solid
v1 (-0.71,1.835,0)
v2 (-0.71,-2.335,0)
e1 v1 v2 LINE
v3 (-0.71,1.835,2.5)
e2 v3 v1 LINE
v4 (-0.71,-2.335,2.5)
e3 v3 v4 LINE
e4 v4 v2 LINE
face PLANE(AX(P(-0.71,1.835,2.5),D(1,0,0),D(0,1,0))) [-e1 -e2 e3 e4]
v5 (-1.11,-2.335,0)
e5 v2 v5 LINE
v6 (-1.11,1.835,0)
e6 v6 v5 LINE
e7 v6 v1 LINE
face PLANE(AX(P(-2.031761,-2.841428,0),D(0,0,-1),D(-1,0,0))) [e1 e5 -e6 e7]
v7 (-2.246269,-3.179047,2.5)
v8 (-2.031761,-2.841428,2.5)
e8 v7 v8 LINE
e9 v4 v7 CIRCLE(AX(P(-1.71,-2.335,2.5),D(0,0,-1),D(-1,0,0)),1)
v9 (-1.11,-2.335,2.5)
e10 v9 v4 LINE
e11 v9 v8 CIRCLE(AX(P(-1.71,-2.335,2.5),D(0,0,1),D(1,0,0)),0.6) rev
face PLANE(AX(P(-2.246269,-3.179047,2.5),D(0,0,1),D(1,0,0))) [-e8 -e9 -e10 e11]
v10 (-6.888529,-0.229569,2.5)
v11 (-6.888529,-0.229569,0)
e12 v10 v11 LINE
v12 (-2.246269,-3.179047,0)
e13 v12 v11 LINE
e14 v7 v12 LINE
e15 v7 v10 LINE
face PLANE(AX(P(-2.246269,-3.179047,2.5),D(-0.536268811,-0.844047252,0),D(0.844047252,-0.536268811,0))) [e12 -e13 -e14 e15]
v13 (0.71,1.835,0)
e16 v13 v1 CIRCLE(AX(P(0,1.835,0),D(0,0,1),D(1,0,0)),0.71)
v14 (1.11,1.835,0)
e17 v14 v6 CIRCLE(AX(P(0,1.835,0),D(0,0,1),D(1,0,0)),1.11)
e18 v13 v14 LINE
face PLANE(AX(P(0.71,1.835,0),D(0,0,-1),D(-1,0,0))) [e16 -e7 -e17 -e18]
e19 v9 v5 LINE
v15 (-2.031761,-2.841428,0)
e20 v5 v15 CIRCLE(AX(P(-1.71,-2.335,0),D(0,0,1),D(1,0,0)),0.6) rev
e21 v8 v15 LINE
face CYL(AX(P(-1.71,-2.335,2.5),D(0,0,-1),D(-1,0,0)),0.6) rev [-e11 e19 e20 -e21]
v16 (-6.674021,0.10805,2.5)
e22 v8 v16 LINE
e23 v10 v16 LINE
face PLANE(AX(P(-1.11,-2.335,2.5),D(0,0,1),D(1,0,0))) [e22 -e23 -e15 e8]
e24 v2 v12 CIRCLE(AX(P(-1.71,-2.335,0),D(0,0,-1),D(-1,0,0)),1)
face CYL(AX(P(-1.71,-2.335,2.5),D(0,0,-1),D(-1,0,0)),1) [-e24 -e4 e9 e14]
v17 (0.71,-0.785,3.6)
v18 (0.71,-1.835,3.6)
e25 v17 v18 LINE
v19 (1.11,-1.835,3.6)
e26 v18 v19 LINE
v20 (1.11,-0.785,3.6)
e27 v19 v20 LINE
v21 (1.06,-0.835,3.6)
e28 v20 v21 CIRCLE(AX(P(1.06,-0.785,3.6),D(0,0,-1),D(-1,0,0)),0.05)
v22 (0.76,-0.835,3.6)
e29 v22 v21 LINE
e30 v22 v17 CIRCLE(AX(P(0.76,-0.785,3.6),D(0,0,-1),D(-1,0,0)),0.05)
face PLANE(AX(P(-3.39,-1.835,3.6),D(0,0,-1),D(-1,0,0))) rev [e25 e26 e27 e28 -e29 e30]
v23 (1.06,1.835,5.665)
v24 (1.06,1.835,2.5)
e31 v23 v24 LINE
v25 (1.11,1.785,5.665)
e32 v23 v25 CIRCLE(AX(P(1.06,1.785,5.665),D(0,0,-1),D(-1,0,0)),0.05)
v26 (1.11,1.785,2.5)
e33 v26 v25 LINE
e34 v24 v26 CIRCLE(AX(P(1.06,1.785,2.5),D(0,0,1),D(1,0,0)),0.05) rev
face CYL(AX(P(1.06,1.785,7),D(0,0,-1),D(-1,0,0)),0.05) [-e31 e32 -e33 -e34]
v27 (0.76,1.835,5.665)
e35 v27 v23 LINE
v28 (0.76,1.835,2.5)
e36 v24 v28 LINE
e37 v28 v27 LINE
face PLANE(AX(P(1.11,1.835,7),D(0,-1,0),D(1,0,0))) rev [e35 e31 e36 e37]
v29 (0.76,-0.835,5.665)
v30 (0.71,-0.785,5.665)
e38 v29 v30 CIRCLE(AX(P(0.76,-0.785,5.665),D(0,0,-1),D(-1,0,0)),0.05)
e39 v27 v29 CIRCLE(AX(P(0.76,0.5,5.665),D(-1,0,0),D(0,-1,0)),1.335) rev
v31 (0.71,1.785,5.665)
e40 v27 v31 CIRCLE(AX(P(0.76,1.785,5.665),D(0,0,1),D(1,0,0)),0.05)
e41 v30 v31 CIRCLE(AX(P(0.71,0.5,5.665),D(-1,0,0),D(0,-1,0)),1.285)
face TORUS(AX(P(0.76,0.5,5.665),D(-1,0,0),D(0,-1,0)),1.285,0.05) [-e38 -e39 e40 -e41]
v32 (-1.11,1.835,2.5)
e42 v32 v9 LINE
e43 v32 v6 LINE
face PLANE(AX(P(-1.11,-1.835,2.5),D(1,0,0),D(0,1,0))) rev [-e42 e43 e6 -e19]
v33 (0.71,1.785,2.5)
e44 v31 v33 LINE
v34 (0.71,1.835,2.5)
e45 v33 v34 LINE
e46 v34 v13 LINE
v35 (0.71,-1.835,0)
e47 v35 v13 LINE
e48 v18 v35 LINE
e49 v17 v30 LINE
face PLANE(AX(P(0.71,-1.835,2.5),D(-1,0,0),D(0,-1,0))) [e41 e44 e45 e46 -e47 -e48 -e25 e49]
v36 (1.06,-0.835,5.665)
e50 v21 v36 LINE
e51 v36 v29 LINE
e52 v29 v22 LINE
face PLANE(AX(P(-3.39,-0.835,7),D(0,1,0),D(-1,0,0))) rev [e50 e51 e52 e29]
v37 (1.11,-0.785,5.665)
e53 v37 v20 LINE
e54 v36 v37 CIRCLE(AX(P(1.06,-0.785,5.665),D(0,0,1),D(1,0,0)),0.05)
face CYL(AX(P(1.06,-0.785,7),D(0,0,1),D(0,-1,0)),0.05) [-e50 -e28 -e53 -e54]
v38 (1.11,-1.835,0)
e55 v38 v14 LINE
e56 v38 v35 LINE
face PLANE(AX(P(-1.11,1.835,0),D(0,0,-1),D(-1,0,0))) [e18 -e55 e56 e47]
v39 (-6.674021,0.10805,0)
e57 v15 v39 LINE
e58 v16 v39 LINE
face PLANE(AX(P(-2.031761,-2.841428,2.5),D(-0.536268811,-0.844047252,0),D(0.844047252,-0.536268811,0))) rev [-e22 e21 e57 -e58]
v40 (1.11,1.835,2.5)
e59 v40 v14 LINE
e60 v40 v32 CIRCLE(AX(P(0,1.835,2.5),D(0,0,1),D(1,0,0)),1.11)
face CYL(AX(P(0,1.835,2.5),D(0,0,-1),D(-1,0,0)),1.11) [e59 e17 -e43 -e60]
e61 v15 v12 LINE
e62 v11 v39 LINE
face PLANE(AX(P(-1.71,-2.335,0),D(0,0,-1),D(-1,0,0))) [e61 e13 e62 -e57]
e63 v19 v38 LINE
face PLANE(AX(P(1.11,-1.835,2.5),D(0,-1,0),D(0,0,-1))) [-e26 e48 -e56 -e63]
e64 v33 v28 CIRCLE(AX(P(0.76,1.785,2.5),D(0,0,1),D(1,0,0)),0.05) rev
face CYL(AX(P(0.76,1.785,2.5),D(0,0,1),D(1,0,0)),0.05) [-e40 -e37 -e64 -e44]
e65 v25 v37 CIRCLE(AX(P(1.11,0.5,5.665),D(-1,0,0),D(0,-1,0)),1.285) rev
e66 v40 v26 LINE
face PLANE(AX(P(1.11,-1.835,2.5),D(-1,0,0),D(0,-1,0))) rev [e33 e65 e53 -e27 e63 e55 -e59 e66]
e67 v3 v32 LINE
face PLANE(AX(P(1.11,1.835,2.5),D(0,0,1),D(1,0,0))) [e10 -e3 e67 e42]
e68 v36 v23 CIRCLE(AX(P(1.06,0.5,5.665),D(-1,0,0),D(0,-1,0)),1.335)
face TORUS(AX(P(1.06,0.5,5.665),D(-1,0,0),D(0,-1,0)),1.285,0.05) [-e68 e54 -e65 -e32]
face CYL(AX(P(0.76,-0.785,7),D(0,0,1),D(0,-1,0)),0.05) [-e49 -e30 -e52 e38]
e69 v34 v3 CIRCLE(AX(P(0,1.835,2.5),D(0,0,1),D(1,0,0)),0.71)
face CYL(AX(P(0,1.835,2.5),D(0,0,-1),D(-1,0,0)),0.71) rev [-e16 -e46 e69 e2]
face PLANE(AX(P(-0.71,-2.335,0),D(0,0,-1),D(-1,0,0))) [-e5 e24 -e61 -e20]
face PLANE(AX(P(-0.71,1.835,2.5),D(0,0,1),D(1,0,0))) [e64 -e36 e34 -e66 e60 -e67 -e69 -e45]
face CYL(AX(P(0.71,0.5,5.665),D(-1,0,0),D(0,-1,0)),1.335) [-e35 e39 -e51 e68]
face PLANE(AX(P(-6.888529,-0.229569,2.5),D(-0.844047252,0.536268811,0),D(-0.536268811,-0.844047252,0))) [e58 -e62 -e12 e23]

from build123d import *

# Parameters (mm, degrees)
BASE_FLANGE1_DEPTH  = 2.5
SKETCH6_W           = 0.4
SKETCH6_H           = 3.67
BOSS_EXTRUDE1_DEPTH = 4.5
SKETCH8_W           = 3.4
SKETCH8_H           = 1
CUT_EXTRUDE1_DEPTH  = 4.5
FILLET1_RADIUS      = 1.335
FILLET1_LENGTH      = 0.4
FILLET2_R           = 0.05


# Sheet-metal steps are written as plain solids
with BuildPart() as part:
    # Sketch1 → Base-Flange1 (new body)
    with BuildSketch(Plane.XY):
        with BuildLine():
            Line((0.71, -1.835), (0.71, 1.835))
            ThreePointArc((0.71, 1.835), (0, 2.545), (-0.71, 1.835))
            Line((-0.71, 1.835), (-0.71, -1.835))
            Line((-0.71, -1.835), (-0.71, -2.335))
            ThreePointArc((-0.71, -2.335), (-1.228475759, -3.211432773), (-2.246268811, -3.179047252))
            Line((-2.246268811, -3.179047252), (-6.888528694, -0.229568793))
            Line((-6.888528694, -0.229568793), (-6.67402117, 0.108050107))
            Line((-6.67402117, 0.108050107), (-2.031761286, -2.841428351))
            ThreePointArc((-2.031761286, -2.841428351), (-1.421085455, -2.860859664), (-1.11, -2.335))
            Line((-1.11, -2.335), (-1.11, -1.835))
            Line((-1.11, -1.835), (-1.11, 1.835))
            ThreePointArc((-1.11, 1.835), (0, 2.945), (1.11, 1.835))
            Line((1.11, 1.835), (1.11, -1.835))
            Line((1.11, -1.835), (0.71, -1.835))
        make_face()
    extrude(amount=BASE_FLANGE1_DEPTH)

    # Sketch6 → Boss-Extrude1 (add)
    with BuildSketch(Plane.XY.offset(2.5)):
        with Locations((0.91, 0)):
            Rectangle(SKETCH6_W, SKETCH6_H)
    extrude(amount=BOSS_EXTRUDE1_DEPTH)

    # Sketch8 → Cut-Extrude1 (cut)
    with BuildSketch(Plane(origin=(1.11, 0, 0), x_dir=(0, 0, -1), z_dir=(1, 0, 0))):
        with Locations((-5.3, -1.335)):
            Rectangle(SKETCH8_W, SKETCH8_H)
    extrude(amount=-CUT_EXTRUDE1_DEPTH, mode=Mode.SUBTRACT)

    # Fillet1: full round fillet: the end face becomes a half cylinder, R = half its width
    fillet1_face = Plane((0.91, 0.5, 7), x_dir=(-1, 0, 0), z_dir=(0, 0, 1))  # on the end face: x along it, z out of the body
    fillet1_slab = fillet1_face.offset(-FILLET1_RADIUS / 2) * Box(FILLET1_LENGTH, 2 * FILLET1_RADIUS, FILLET1_RADIUS, mode=Mode.PRIVATE)  # the body's end, R deep
    fillet1_round = Plane((0.91, 0.5, 5.665), x_dir=(0, 0, 1), z_dir=(-1, 0, 0)) * Cylinder(FILLET1_RADIUS, FILLET1_LENGTH, mode=Mode.PRIVATE)  # its axis R under the face
    add(fillet1_slab - fillet1_round, mode=Mode.SUBTRACT)

    # Fillet2
    fillet2_edges = [part.edges().sort_by_distance(p)[0] for p in [
        (1.11, -0.835, 4.6325),
        (0.71, 1.835, 4.0825),
        (1.11, 1.835, 4.0825),
        (0.71, -0.835, 4.6325),
        (0.71, 0.5, 7),
        (1.11, 0.5, 7),
    ]]
    fillet(fillet2_edges, radius=FILLET2_R)


solid = part.part
